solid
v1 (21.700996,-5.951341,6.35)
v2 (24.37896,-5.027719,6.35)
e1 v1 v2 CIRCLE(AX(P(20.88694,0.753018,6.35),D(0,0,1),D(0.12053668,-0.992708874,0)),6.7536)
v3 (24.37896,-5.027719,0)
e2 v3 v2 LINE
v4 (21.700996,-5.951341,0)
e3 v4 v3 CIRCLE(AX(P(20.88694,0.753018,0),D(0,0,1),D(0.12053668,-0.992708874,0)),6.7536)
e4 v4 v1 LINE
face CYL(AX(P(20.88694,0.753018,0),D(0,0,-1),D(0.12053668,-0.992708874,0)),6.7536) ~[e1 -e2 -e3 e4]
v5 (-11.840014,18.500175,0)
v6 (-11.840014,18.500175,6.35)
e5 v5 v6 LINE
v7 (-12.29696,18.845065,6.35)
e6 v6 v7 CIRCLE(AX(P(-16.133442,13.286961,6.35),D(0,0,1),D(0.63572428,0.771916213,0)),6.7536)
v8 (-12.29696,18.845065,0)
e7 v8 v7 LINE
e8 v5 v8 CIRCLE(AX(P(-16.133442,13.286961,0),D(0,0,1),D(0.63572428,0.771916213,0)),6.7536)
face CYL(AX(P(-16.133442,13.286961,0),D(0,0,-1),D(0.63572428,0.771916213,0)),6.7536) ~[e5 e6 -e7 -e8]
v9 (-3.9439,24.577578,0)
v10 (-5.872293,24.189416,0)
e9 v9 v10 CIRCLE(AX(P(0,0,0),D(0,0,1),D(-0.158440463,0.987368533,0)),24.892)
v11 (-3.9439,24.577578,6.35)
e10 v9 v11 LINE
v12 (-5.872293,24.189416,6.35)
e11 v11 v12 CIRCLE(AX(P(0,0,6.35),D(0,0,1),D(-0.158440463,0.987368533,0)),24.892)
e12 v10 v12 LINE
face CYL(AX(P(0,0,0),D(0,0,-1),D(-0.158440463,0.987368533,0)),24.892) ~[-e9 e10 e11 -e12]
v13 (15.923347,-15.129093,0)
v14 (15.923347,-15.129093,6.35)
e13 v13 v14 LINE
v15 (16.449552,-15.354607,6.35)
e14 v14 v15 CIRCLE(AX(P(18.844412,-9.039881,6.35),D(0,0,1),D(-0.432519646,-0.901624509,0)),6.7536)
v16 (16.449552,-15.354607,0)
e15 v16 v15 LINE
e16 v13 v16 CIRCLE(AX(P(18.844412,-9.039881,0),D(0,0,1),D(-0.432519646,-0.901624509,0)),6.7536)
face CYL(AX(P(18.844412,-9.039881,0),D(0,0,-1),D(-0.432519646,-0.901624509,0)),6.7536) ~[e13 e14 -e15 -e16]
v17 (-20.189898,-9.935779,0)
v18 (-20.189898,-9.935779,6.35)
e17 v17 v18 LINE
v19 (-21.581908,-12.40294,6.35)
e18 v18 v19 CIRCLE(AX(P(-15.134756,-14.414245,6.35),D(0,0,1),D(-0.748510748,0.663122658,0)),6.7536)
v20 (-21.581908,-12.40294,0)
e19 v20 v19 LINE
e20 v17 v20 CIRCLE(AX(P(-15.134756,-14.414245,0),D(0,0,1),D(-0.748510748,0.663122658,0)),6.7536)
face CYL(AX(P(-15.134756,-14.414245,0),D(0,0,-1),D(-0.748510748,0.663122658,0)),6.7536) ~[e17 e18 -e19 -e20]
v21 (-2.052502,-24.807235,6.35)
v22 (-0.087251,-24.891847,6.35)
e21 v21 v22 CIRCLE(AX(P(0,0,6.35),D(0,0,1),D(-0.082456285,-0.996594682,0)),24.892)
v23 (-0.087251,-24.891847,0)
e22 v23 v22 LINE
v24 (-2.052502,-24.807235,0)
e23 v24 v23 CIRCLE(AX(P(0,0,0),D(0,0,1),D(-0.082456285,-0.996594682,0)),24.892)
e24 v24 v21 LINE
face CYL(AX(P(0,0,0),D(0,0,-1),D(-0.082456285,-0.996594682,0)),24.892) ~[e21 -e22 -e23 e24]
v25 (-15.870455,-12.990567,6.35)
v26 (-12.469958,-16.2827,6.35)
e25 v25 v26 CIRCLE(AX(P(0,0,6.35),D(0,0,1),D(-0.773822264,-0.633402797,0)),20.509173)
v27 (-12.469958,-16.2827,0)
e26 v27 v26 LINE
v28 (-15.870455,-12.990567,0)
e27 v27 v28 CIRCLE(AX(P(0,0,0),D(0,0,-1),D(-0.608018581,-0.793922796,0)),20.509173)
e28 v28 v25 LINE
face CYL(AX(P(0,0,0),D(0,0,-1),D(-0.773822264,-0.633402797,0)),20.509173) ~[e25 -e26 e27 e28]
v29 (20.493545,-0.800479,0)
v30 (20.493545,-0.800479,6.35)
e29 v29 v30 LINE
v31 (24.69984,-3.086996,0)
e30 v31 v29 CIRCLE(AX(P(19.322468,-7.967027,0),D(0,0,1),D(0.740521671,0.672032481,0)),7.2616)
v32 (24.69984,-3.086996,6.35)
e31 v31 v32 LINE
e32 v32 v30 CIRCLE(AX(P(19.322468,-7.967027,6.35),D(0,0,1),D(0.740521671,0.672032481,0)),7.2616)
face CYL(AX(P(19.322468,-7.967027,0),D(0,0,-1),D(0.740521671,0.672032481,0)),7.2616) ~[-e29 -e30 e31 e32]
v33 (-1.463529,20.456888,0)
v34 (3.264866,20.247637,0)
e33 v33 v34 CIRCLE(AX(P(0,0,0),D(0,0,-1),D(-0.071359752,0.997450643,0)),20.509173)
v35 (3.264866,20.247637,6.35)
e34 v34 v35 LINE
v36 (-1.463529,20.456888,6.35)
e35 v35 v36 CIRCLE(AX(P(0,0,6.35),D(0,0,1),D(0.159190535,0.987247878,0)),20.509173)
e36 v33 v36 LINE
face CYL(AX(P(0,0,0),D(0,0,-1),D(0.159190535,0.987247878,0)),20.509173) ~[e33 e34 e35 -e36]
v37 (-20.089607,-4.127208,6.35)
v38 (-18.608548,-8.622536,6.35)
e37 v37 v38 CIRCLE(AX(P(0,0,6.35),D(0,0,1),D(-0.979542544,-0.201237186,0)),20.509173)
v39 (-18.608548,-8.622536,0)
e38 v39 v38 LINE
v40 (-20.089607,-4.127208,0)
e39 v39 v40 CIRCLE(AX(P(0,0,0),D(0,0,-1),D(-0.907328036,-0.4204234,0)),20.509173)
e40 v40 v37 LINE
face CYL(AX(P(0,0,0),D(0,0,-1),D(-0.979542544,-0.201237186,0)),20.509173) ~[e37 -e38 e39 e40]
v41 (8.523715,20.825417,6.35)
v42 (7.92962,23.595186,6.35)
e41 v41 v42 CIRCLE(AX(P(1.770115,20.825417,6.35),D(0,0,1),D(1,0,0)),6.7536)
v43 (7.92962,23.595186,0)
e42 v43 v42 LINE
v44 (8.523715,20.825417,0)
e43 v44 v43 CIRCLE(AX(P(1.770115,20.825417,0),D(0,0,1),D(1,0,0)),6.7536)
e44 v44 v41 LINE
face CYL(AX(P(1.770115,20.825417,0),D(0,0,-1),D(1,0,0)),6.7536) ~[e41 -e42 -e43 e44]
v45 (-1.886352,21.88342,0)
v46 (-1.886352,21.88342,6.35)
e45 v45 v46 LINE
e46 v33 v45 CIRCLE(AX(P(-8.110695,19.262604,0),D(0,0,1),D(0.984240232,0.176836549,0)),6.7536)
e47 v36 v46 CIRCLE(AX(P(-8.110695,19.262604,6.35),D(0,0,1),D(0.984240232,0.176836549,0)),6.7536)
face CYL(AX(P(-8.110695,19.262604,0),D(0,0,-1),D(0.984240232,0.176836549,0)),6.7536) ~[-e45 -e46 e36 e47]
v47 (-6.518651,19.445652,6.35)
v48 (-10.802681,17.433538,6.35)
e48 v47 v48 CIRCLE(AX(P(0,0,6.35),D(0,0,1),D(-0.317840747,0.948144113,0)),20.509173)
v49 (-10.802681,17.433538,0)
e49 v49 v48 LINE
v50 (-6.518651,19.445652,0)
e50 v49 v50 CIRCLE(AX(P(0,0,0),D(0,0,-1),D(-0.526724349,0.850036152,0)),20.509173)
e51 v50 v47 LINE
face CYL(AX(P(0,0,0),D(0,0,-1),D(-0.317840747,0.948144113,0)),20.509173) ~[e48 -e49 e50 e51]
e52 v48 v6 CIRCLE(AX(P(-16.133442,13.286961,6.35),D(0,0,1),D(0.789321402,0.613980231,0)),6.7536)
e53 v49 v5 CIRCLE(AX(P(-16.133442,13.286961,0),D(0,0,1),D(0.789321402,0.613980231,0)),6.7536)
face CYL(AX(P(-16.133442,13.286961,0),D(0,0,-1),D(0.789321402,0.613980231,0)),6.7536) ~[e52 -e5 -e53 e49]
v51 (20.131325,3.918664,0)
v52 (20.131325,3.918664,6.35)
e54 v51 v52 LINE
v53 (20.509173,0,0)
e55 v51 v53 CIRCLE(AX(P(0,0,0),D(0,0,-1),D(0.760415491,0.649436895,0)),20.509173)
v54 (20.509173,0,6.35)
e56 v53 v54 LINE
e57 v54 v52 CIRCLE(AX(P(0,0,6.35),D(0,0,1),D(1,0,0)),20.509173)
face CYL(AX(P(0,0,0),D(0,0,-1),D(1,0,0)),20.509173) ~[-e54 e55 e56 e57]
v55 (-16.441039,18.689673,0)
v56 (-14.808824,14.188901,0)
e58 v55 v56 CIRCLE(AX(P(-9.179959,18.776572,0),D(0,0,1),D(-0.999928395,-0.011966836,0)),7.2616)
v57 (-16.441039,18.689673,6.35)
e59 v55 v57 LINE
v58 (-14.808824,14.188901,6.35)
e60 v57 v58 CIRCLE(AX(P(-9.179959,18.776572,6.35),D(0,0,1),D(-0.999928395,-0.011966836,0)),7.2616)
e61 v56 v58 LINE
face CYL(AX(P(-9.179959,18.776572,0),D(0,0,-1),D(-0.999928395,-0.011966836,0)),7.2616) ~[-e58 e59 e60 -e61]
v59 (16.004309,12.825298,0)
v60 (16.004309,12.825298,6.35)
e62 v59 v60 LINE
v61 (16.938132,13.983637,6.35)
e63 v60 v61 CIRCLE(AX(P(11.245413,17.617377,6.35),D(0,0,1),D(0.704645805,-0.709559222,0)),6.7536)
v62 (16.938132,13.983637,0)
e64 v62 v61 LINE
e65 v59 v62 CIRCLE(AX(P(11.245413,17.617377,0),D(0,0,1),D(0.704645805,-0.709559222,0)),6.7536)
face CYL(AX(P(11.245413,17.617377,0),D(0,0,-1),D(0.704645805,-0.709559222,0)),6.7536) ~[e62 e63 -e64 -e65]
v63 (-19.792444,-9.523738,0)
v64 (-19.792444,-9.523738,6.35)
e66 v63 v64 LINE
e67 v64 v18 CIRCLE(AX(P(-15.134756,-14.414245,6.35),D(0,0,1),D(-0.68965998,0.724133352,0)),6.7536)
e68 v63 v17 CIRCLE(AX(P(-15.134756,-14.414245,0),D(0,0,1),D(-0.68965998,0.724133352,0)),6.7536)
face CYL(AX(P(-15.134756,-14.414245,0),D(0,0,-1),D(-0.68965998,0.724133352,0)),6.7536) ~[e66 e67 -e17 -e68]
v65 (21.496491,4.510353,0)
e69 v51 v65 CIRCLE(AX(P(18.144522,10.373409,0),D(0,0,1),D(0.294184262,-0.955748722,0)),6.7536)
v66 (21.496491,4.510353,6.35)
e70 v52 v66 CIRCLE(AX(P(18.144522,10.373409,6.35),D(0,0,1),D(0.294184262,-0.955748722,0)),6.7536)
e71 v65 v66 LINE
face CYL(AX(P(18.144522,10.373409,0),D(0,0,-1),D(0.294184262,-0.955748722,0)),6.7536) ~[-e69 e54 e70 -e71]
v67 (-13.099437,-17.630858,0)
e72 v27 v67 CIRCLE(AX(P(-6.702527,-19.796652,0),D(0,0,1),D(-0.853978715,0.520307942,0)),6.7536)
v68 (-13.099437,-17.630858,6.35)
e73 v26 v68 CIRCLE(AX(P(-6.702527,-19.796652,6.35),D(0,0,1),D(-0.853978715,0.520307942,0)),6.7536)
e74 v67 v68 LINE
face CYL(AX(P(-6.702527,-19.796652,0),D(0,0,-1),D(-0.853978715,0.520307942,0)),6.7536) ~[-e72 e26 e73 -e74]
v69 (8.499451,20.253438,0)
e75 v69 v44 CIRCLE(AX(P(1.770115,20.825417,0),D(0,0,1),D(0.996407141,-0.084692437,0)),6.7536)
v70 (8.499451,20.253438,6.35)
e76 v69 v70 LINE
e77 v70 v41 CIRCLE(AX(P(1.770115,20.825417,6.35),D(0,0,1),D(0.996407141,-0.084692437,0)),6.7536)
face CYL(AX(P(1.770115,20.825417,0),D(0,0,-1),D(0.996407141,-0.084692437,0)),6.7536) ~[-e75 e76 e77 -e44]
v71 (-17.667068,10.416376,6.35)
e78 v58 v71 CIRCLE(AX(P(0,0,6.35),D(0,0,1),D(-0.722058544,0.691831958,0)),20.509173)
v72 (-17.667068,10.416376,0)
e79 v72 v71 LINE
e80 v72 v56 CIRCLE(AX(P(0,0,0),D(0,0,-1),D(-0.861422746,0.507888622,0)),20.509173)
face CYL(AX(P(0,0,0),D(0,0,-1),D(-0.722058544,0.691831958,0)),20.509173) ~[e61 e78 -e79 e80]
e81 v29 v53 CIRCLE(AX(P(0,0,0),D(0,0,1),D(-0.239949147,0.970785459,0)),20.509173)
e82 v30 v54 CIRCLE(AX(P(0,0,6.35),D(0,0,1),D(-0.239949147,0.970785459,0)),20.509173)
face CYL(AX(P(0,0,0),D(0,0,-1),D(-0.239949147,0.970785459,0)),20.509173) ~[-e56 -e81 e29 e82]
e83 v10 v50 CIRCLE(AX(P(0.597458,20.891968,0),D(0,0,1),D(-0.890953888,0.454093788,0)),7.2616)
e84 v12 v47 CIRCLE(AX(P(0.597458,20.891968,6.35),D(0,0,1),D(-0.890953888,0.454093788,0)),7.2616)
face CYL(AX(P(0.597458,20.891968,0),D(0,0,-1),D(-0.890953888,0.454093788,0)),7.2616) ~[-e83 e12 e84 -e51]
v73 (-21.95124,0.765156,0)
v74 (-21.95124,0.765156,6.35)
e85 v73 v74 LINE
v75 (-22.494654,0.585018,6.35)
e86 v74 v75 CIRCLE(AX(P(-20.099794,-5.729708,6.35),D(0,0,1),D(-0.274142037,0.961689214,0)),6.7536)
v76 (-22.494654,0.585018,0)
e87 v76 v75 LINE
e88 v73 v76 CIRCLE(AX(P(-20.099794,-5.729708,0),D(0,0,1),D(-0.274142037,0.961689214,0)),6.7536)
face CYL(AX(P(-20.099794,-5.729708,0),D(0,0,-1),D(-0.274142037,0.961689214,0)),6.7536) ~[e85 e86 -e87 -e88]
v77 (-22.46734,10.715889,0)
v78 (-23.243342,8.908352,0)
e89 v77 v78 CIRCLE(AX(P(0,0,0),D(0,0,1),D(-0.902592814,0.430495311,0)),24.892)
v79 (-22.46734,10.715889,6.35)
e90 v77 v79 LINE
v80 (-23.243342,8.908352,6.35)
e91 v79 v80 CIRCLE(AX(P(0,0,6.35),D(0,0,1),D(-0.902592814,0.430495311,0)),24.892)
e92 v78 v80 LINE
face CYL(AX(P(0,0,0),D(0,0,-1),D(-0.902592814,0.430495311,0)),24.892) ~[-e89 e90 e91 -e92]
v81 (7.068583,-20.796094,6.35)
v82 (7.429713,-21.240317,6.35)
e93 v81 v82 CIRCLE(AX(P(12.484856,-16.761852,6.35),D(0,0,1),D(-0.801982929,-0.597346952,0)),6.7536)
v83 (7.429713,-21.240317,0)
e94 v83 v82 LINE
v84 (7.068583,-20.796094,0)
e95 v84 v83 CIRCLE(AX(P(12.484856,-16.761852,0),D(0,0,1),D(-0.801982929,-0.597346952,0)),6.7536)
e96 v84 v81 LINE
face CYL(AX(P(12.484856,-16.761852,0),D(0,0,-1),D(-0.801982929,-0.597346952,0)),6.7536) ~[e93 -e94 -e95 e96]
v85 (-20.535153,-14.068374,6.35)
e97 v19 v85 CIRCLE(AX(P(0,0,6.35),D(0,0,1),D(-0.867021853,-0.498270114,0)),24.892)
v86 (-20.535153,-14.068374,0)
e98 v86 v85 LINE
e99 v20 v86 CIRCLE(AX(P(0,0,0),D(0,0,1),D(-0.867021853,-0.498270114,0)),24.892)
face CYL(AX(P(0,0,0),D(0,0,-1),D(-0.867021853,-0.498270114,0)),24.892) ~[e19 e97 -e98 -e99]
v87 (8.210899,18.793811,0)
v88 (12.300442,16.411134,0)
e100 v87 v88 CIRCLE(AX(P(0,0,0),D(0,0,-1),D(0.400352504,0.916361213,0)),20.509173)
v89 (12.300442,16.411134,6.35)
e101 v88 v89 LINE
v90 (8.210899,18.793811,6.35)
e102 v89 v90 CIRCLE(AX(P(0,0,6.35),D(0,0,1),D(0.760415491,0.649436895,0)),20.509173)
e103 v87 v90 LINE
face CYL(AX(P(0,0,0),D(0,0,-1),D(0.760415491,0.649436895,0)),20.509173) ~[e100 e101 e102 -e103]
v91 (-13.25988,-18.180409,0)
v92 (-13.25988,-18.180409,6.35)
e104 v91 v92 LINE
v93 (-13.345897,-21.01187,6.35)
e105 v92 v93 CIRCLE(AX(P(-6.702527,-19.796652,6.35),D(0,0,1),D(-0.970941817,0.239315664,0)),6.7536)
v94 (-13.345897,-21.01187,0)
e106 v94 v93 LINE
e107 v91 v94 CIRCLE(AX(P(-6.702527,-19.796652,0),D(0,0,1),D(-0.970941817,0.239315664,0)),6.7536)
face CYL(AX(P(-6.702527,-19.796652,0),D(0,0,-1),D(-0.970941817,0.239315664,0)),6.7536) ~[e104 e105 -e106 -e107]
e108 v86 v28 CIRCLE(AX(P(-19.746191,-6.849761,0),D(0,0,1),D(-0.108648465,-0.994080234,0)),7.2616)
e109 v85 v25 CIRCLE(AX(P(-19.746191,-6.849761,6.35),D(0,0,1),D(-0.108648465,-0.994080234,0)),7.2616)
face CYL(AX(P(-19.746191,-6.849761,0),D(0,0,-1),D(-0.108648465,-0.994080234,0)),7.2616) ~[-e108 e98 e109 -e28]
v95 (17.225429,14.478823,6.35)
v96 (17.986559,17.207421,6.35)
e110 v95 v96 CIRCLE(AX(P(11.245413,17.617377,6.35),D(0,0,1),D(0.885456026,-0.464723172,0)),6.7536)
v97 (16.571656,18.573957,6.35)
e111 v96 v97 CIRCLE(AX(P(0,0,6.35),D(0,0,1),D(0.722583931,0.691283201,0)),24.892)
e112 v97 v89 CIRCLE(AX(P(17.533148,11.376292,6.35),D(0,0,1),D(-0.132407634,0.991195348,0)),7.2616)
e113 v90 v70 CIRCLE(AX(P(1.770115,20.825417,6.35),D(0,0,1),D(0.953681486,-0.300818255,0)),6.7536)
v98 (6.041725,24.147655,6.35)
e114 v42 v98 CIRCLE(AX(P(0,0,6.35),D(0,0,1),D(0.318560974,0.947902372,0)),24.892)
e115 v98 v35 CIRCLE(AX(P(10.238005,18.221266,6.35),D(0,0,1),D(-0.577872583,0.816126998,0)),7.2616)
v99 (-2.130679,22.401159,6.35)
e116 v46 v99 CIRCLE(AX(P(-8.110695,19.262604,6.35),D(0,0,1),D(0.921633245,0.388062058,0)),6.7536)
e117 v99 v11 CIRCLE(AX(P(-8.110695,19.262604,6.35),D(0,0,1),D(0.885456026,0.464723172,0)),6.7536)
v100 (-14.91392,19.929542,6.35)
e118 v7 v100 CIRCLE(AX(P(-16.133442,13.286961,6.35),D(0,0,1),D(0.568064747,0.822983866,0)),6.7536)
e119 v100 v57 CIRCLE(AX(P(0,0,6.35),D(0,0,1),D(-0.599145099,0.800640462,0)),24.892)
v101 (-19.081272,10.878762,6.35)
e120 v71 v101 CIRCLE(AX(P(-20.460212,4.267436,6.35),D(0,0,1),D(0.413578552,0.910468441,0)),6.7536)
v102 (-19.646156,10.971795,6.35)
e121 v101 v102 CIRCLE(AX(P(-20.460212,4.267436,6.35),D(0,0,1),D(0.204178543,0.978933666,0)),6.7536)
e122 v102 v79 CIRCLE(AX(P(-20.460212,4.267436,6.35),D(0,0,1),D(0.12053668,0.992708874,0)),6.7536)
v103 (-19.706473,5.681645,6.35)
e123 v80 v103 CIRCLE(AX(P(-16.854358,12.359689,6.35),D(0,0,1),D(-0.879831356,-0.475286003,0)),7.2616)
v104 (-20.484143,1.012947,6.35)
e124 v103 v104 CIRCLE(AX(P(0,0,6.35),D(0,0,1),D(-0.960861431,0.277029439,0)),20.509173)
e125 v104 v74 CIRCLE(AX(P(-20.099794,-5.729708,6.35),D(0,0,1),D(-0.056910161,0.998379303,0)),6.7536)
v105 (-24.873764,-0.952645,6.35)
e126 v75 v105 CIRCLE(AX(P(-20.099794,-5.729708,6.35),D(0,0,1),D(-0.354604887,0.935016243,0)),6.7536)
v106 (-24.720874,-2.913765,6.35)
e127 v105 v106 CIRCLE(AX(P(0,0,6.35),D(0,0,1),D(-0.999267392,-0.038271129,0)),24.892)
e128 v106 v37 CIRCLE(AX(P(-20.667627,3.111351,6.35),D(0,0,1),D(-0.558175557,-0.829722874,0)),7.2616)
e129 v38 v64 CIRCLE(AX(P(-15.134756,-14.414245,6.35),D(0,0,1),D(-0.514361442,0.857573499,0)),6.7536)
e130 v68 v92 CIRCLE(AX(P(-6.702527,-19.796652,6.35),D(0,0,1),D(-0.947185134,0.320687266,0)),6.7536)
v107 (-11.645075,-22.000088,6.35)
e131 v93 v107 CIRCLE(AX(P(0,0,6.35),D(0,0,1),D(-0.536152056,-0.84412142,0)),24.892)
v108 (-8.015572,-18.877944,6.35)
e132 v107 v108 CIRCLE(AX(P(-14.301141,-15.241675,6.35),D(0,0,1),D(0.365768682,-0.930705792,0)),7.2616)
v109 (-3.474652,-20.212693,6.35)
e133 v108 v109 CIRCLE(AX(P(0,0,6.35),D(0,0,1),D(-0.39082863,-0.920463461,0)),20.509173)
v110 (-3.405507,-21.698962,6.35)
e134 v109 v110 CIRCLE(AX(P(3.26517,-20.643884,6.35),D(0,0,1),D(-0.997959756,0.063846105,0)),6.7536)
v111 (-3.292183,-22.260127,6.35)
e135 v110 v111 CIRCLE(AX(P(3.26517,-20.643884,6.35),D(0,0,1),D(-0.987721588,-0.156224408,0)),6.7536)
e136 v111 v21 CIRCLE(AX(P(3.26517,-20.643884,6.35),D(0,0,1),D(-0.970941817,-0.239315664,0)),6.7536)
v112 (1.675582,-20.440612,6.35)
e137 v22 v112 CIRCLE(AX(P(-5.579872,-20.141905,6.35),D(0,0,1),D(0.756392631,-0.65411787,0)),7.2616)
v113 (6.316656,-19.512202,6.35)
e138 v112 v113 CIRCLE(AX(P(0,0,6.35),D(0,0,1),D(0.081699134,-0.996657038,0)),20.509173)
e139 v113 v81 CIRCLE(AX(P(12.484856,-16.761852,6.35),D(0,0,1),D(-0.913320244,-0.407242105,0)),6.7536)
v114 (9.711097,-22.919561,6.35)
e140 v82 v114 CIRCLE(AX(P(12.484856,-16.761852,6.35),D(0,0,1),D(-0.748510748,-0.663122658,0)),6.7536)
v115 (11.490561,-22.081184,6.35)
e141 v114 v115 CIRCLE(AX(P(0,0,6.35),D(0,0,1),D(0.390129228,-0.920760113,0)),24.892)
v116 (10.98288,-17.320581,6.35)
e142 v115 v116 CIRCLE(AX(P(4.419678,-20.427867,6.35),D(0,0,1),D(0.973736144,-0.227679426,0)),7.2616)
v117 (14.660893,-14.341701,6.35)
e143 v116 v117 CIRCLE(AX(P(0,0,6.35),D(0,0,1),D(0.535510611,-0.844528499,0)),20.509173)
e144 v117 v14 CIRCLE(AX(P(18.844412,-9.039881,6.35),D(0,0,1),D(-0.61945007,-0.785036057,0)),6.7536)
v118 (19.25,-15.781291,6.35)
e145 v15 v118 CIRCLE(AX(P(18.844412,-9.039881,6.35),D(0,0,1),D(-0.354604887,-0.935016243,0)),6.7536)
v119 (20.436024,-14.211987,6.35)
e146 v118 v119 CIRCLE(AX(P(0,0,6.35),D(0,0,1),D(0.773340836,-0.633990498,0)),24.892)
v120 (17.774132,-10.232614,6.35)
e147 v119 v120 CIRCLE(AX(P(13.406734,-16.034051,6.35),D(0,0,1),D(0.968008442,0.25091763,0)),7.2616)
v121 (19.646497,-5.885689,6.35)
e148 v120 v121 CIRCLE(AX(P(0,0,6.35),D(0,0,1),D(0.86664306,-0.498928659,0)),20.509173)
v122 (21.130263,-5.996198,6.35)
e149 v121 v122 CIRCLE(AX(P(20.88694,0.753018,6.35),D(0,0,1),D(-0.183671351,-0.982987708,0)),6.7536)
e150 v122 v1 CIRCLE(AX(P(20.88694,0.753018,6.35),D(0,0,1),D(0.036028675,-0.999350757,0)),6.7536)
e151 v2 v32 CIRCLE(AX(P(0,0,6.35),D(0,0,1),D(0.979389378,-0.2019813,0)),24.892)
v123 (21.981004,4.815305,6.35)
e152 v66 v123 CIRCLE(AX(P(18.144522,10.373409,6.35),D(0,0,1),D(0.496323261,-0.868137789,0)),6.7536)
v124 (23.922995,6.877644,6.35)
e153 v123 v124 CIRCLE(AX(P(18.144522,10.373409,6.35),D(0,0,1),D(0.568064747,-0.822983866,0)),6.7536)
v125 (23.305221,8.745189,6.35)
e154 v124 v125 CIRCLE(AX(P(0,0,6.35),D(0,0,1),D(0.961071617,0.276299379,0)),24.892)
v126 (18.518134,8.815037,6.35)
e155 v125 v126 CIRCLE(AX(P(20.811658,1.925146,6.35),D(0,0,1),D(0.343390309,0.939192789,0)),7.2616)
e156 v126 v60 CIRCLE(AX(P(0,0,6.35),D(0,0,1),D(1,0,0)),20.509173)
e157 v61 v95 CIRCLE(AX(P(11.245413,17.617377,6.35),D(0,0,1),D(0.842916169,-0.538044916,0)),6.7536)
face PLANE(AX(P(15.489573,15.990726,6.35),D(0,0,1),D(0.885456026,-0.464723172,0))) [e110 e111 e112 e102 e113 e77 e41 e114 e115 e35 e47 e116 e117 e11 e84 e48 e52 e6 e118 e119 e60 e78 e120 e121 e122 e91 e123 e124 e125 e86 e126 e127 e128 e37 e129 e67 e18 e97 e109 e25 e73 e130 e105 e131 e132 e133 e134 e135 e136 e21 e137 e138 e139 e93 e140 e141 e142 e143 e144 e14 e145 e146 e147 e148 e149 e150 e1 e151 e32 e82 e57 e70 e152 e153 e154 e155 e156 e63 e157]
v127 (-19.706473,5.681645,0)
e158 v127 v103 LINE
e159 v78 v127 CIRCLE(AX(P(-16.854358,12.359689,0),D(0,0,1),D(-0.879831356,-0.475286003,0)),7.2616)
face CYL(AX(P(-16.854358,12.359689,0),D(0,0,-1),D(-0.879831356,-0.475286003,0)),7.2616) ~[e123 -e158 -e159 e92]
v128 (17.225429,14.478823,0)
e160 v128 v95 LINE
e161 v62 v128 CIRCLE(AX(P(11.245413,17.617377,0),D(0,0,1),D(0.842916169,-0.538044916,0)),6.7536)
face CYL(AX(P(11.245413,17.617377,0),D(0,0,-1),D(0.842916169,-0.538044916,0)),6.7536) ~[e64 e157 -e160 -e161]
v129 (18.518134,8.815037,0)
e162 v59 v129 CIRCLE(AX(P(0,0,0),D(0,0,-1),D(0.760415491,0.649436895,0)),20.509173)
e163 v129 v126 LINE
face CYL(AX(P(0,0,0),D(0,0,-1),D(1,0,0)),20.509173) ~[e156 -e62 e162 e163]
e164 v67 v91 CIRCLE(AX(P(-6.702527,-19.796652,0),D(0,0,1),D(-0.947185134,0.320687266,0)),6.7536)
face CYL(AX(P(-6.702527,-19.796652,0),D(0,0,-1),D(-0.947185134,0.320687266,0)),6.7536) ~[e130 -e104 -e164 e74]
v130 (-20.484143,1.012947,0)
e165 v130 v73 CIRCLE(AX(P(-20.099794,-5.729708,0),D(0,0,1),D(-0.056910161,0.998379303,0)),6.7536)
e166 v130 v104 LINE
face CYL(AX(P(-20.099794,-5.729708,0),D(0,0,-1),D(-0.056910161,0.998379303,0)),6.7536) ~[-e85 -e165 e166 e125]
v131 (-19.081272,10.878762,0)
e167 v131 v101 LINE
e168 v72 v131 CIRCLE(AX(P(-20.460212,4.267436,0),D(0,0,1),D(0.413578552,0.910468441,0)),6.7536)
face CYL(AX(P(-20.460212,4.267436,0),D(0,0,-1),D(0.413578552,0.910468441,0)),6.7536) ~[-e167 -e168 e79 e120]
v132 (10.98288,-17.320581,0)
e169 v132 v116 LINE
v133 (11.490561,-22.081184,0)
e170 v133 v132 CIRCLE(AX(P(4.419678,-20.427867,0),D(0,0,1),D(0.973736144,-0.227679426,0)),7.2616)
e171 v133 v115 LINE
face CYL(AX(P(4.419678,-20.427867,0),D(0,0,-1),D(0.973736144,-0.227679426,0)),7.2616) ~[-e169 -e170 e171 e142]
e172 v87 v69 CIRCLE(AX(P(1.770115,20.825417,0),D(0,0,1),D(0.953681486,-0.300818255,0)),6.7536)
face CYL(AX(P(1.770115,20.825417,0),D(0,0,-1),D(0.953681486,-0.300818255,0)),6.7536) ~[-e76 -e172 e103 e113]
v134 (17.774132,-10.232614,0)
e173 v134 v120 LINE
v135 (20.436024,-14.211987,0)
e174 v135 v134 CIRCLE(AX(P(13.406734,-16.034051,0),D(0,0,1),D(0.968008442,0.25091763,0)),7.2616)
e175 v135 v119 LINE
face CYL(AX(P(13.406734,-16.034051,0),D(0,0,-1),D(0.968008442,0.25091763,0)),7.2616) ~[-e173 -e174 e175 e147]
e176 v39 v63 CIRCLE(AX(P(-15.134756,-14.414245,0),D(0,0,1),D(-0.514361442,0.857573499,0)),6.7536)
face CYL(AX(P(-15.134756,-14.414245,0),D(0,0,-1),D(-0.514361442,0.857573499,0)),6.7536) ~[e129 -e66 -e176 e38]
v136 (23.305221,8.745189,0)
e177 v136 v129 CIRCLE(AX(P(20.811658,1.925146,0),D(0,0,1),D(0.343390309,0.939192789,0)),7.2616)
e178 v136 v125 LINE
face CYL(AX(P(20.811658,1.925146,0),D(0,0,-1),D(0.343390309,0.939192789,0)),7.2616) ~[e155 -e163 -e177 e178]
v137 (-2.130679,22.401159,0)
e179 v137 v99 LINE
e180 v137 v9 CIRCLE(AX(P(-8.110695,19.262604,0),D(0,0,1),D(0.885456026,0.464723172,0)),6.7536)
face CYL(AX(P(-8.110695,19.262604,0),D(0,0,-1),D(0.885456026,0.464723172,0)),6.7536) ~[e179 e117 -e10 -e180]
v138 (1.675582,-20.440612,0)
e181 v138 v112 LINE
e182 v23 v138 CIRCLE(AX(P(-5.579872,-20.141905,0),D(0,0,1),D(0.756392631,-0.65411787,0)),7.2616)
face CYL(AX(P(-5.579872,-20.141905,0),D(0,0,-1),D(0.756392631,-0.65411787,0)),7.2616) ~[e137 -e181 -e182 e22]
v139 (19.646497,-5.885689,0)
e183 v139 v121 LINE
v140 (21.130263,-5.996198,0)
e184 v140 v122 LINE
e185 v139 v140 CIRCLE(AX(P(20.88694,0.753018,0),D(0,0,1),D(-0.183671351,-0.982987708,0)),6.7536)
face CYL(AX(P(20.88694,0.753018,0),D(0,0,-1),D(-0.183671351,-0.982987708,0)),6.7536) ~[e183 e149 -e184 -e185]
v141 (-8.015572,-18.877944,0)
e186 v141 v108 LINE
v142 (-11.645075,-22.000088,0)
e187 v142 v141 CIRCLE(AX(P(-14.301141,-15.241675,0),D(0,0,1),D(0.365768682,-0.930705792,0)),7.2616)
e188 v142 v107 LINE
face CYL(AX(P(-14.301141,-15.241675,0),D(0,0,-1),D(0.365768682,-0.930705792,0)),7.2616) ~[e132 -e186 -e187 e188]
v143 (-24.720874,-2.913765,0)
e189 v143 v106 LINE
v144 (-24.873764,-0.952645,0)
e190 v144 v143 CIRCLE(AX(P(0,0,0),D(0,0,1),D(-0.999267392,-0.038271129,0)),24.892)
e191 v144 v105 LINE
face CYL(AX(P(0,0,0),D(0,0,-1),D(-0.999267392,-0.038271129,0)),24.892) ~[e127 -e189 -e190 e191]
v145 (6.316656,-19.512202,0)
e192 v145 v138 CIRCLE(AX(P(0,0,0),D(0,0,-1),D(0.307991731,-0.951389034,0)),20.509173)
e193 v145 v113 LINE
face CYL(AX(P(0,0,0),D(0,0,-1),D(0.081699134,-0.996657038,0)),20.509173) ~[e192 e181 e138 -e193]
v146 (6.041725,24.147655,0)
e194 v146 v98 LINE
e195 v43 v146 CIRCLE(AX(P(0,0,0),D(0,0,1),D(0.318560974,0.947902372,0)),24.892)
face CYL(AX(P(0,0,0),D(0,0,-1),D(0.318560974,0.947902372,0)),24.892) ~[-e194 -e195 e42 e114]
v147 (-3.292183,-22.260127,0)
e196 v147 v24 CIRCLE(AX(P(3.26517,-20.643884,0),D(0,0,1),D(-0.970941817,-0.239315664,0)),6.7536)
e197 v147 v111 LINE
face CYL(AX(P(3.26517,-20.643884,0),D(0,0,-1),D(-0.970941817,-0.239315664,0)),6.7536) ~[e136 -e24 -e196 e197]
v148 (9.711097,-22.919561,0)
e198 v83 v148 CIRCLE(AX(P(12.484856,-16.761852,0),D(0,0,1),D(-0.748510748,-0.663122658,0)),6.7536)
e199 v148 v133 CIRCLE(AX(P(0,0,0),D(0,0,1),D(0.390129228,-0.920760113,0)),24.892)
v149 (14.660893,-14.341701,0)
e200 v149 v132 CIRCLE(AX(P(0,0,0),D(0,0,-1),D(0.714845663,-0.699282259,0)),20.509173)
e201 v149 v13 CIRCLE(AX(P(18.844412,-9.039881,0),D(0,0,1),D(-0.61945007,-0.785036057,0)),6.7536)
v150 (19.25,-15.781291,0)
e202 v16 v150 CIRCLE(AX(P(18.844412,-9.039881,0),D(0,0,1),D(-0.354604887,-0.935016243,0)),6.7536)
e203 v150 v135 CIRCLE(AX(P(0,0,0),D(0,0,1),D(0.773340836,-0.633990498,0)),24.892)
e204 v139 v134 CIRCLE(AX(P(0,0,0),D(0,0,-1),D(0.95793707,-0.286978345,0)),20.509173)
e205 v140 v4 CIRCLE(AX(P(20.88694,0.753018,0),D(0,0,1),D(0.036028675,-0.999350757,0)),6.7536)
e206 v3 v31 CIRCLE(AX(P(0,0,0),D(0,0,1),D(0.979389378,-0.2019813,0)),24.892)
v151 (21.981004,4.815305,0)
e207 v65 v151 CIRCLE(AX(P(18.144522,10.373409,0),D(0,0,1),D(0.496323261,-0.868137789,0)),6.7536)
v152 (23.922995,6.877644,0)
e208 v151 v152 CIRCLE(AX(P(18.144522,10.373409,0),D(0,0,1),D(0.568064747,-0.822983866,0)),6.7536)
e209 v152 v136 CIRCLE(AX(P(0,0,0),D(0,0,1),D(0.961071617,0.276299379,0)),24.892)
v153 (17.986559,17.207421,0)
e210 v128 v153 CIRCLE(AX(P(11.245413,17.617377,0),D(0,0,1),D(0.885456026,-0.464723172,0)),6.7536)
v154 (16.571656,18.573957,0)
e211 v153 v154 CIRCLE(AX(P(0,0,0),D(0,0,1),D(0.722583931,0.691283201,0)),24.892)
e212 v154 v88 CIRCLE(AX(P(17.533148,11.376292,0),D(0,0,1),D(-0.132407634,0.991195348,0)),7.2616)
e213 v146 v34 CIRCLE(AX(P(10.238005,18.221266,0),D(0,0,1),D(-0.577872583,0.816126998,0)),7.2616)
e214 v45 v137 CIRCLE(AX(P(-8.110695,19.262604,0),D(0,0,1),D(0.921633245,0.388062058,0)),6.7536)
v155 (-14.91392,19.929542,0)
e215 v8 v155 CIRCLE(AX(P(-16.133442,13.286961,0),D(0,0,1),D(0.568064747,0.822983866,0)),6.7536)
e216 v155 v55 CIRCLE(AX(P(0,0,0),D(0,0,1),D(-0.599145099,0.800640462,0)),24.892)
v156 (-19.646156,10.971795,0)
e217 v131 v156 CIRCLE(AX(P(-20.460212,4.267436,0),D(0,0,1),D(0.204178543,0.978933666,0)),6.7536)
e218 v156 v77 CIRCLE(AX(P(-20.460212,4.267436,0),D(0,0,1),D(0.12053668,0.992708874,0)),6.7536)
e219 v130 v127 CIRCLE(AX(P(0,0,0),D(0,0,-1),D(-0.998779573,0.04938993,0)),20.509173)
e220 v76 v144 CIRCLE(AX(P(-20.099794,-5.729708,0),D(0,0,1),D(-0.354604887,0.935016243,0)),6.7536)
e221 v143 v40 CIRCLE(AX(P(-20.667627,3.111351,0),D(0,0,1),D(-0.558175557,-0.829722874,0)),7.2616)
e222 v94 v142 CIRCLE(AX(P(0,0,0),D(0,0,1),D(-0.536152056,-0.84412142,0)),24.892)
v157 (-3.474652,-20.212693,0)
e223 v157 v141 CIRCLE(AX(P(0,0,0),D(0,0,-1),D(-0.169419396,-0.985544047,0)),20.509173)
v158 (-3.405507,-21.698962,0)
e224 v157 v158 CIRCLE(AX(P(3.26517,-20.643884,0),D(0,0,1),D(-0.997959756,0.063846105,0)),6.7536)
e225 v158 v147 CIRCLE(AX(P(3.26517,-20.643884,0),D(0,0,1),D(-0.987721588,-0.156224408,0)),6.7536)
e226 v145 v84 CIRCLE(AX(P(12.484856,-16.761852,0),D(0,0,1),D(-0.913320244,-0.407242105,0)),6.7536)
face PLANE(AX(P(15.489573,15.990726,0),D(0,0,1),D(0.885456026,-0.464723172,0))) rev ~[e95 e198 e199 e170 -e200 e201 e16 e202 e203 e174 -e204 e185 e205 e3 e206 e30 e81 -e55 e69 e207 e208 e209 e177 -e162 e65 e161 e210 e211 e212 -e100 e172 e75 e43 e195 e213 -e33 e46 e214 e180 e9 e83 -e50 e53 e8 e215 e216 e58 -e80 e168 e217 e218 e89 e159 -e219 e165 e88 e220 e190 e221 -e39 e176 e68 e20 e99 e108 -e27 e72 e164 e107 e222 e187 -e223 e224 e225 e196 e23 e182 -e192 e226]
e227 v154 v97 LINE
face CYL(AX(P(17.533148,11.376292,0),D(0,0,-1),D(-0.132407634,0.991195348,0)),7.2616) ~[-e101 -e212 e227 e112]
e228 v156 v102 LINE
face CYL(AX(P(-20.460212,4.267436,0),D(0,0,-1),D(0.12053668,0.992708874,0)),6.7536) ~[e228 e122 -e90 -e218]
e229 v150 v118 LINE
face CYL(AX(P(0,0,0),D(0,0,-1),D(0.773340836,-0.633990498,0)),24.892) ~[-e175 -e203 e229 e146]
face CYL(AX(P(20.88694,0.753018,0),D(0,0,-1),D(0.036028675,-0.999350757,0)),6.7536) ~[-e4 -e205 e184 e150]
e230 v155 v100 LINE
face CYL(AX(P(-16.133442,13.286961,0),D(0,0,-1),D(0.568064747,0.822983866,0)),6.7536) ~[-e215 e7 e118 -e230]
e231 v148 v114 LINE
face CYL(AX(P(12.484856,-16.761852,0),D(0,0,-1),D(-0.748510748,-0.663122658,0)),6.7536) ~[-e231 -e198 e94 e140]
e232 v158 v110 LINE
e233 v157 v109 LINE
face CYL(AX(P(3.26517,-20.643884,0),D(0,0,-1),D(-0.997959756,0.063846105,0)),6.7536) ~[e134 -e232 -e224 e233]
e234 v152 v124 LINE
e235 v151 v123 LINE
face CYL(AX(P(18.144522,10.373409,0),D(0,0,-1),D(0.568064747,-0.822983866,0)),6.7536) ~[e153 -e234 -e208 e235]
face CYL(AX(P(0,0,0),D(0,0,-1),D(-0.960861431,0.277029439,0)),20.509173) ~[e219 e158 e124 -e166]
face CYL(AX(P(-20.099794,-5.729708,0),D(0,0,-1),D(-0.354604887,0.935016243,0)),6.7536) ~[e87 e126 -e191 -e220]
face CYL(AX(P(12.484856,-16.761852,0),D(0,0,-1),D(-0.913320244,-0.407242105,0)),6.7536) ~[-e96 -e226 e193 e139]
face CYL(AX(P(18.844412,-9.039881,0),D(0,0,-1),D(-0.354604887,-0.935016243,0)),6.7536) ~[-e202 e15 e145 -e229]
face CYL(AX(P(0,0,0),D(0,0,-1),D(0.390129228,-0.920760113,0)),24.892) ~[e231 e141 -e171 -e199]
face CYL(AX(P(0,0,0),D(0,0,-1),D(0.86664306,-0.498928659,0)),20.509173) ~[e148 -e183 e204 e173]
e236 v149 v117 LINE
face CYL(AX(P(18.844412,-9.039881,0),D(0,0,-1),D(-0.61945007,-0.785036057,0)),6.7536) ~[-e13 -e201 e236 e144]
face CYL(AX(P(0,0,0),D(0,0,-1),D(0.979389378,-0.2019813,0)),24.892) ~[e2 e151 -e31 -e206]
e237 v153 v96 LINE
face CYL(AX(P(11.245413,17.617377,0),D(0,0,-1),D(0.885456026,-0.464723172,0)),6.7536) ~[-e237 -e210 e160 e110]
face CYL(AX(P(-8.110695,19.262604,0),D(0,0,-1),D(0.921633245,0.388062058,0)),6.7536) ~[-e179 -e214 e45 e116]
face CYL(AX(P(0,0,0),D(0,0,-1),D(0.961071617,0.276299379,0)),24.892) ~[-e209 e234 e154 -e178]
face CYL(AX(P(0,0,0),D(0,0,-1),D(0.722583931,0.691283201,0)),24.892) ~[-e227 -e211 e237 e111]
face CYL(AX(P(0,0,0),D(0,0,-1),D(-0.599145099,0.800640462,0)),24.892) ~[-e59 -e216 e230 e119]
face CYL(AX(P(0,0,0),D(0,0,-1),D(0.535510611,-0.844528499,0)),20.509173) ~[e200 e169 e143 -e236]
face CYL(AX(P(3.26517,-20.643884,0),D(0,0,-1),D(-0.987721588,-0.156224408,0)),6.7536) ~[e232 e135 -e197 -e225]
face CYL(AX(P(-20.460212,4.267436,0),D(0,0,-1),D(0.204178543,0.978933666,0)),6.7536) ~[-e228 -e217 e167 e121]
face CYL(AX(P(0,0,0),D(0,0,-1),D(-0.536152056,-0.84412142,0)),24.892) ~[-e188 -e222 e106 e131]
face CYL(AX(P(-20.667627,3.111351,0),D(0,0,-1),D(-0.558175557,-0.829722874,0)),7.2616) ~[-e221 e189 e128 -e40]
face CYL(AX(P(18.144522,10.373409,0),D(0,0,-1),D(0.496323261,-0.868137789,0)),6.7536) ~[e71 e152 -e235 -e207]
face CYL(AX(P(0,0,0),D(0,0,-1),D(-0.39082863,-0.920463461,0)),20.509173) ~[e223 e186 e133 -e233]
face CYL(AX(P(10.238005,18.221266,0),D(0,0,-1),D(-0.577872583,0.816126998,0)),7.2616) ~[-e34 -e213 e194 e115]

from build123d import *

# Parameters (mm, degrees)
F1_DEPTH = 6.35
F2_COUNT = 13


with BuildPart() as f1:
    # F0 (on Top) → F1 (new body)
    with BuildSketch(Plane.XY):
        with BuildLine():
            ThreePointArc((7.9296197565, 23.5951858335), (6.9911317973, 23.8900761864), (6.0417249702, 24.1476546146))
            ThreePointArc((6.0417249702, 24.1476546146), (4.3226425573, 22.4330749308), (3.2648662162, 20.2476374354))
            ThreePointArc((3.2648662162, 20.2476374354), (5.7837443287, 19.6767495961), (8.2108987358, 18.7938105523))
            ThreePointArc((8.2108987358, 18.7938105523), (8.3954934616, 19.5156536929), (8.4994507341, 20.2534379554))
            ThreePointArc((8.4994507341, 20.2534379554), (8.5176465567, 20.5391701676), (8.5237154667, 20.8254168329))
            ThreePointArc((8.5237154667, 20.8254168329), (8.373521449, 22.2418004346), (7.9296197565, 23.5951858335))
        make_face()
        with BuildLine():
            ThreePointArc((4.0264902572, 14.4598933509), (-1.7431476836, 15.057566034), (-4.9211585336, 19.9100068261))
            ThreePointArc((-4.9211585336, 19.9100068261), (-12.6431262329, -16.1486077476), (20.5091729021, 0))
            ThreePointArc((20.5091729021, 0), (19.2415803806, 7.0984334598), (15.5954927821, 13.3194135761))
            ThreePointArc((15.5954927821, 13.3194135761), (9.5256046991, 10.9946956396), (4.0264902572, 14.4598933509))
        make_face()
        with BuildLine():
            ThreePointArc((3.2648662162, 20.2476374354), (-0.8451772993, 20.4917507417), (-4.9211585336, 19.9100068261))
            ThreePointArc((-4.9211585336, 19.9100068261), (-1.7431476836, 15.057566034), (4.0264902572, 14.4598933509))
            ThreePointArc((4.0264902572, 14.4598933509), (3.0384725246, 17.2738616412), (3.2648662162, 20.2476374354))
        make_face()
        with BuildLine():
            ThreePointArc((4.0264902572, 14.4598933509), (9.5256046991, 10.9946956396), (15.5954927821, 13.3194135761))
            ThreePointArc((15.5954927821, 13.3194135761), (12.2138579016, 16.4756744411), (8.2108987358, 18.7938105523))
            ThreePointArc((8.2108987358, 18.7938105523), (6.6287005247, 16.1344397874), (4.0264902572, 14.4598933509))
        make_face()
        with BuildLine():
            ThreePointArc((8.2108987358, 18.7938105523), (5.7837443287, 19.6767495961), (3.2648662162, 20.2476374354))
            ThreePointArc((3.2648662162, 20.2476374354), (3.0384725246, 17.2738616412), (4.0264902572, 14.4598933509))
            ThreePointArc((4.0264902572, 14.4598933509), (6.6287005247, 16.1344397874), (8.2108987358, 18.7938105523))
        make_face()
    extrude(amount=F1_DEPTH)

    # F2: F1 ×13 about axis
    f2_axis = Axis((0, 0, 6.35), (0, 0, 1))


with BuildPart() as f1_1:
    add(f1.part)
    for i in range(1, F2_COUNT):
        add(f1.part.rotate(f2_axis, i * 360 / F2_COUNT))


solid = f1_1.part
